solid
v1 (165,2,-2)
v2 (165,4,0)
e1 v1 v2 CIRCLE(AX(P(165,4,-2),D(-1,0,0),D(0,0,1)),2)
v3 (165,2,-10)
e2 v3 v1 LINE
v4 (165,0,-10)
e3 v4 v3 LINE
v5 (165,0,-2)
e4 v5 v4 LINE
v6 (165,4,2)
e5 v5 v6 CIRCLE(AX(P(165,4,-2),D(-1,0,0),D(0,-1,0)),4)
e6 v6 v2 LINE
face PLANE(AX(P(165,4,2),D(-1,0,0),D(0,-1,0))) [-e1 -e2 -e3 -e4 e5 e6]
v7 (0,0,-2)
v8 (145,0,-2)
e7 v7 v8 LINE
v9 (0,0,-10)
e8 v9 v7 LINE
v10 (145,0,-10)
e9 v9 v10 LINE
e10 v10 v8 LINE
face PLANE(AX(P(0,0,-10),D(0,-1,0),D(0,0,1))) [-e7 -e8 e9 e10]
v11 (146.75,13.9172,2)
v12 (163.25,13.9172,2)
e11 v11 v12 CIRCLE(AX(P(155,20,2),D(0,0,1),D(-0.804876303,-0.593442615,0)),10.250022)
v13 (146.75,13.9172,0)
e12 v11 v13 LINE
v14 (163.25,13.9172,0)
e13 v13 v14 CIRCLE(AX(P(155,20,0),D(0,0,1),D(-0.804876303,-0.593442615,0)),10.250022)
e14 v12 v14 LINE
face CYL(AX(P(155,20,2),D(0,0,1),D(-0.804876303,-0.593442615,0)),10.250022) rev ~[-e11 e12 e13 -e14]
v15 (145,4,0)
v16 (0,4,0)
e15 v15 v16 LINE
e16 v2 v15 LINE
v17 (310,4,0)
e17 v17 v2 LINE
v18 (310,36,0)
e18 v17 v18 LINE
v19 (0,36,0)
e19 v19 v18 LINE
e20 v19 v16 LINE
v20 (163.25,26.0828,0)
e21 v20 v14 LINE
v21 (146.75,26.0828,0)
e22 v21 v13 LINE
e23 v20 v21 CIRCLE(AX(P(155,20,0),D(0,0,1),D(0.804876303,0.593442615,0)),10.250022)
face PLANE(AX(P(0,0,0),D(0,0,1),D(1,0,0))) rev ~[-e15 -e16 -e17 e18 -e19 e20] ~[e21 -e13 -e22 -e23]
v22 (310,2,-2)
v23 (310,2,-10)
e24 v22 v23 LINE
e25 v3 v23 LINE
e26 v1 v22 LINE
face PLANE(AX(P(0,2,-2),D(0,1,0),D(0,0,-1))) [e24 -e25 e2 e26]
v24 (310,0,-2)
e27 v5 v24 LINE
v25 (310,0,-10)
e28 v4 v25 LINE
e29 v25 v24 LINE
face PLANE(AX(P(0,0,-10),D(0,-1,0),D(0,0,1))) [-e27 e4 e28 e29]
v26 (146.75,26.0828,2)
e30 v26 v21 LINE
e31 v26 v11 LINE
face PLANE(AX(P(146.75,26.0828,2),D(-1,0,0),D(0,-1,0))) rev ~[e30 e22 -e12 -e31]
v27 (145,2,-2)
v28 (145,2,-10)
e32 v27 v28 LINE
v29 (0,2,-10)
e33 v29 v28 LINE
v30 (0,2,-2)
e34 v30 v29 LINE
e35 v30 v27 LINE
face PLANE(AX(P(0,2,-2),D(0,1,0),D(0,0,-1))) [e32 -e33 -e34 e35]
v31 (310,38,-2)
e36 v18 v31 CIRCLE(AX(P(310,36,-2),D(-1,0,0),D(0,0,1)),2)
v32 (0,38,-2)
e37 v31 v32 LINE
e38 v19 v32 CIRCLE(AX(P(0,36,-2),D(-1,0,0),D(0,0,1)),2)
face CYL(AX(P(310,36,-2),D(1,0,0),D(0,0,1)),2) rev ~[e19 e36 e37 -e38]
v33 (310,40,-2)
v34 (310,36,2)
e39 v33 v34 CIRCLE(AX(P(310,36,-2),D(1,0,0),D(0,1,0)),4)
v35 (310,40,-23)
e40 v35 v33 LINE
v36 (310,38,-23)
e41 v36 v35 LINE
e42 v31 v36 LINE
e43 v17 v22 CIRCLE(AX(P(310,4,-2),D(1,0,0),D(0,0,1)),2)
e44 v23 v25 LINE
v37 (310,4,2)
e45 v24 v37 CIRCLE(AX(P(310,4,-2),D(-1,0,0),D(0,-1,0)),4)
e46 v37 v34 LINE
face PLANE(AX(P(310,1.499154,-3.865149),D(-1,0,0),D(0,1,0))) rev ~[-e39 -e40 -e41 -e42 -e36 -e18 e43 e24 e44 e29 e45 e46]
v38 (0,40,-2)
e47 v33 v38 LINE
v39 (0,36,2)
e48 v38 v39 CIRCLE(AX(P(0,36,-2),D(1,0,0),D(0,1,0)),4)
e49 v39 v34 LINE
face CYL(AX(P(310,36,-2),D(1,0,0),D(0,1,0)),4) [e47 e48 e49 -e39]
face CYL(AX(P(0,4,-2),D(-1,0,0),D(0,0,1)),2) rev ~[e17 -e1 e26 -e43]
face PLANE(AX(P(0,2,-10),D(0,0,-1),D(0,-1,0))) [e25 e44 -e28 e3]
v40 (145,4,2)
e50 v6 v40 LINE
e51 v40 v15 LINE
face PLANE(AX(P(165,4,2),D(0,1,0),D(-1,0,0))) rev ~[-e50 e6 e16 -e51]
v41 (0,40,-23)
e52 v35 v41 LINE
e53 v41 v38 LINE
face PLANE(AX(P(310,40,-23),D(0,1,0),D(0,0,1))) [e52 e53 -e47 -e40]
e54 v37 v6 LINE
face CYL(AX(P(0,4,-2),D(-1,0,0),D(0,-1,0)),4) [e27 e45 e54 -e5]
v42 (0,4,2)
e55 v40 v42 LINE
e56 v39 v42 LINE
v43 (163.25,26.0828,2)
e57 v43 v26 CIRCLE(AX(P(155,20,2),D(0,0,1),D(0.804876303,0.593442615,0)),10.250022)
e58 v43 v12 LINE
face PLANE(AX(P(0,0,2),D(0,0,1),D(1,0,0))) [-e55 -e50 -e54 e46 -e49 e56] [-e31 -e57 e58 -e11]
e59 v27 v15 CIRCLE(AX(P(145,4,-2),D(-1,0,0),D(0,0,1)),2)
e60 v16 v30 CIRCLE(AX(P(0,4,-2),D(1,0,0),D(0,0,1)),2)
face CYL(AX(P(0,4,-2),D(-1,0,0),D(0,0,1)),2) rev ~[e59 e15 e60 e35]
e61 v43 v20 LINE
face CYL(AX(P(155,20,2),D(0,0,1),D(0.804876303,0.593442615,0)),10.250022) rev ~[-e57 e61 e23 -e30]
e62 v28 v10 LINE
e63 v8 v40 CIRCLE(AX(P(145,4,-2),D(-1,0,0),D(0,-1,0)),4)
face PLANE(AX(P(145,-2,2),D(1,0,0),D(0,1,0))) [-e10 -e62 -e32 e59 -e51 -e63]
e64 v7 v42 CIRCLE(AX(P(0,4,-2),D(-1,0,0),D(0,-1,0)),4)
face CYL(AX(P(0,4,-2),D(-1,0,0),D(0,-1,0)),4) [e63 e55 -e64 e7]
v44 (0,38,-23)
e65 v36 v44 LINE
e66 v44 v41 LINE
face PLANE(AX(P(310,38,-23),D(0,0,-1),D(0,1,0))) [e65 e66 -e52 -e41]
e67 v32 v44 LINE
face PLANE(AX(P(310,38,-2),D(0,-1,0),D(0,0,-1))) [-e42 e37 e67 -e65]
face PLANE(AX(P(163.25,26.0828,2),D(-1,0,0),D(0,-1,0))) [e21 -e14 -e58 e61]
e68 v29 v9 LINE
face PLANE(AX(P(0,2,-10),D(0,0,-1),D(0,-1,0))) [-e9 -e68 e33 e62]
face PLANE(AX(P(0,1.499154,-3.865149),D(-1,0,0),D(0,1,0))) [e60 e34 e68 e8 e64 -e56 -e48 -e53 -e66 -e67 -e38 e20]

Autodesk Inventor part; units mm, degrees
ref_plane "YZ Plane" through (0, 0, 0) normal (1, 0, 0) x (0, 1, 0)
ref_plane "XZ Plane" through (0, 0, 0) normal (0, 1, 0) x (-1, 0, 0)
ref_plane "XY Plane" through (0, 0, 0) normal (0, 0, 1) x (1, 0, 0)
sketch "Sketch1" plane through (0, 0, 0) normal (0, 0, 1) x (1, 0, 0)
  line L0 (0, 0) -> (310, 0)
  line L1 (310, 0) -> (310, 40)
  line L2 (310, 40) -> (0, 40)
  line L3 (0, 40) -> (0, 0)
  dimension "d1" = 40
  dimension "d2" = 310
extrude "Plate1" add sketch "Sketch1" along normal blind 2
sketch "Sketch2" plane through (310, 38, 2) normal (0, 1, 0) x (-1, 0, 0)
  line L0 (310, 0) -> (0, 0)
  line L1 (0, 0) -> (0, -25)
  line L2 (0, -25) -> (310, -25)
  line L3 (310, -25) -> (310, 0)
edge flange "Flange1" height 25 angle 90 thickness 2 bend radius 2 thickness toward (0, 1, 0) relief tear relief width 2 relief depth 1 edges at (155, 40, 0) wall of the first edge with corners at (0, 38, 2) (310, 38, 2) (310, 38, -23) (0, 38, -23)
bend "Bend1"
corner "Corner1"
sketch "Sketch3" plane through (0, 2, 2) normal (0, -1, 0) x (1, 0, 0)
  line L0 (310, 0) -> (0, 0)
  line L1 (0, 0) -> (0, -12)
  line L2 (0, -12) -> (310, -12)
  line L3 (310, -12) -> (310, 0)
edge flange "Flange2" height 12 angle 90 thickness 2 bend radius 2 thickness toward (0, -1, 0) relief tear relief width 2 relief depth 1 edges at (155, 0, 0) wall of the first edge with corners at (310, 2, 2) (0, 2, 2) (0, 2, -10) (310, 2, -10)
bend "Bend2"
corner "Corner2"
sketch "Sketch4" plane through (0, 0, 2) normal (0, 0, 1) x (1, 0, 0)
  arc A0 (146.75, 13.9172) -> (163.25, 13.9172) centre (155, 20) ccw
  line L0 (0, 4) -> (0, 36) projected
  line L1 (0, 40) -> (310, 40) projected
  line L2 (146.75, 26.0828) -> (146.75, 13.9172)
  line L3 (163.25, 26.0828) -> (163.25, 13.9172)
  arc A1 (146.75, 26.0828) -> (146.75, 13.9172) centre (155, 20) ccw construction
  arc A2 (163.25, 26.0828) -> (146.75, 26.0828) centre (155, 20) ccw
  arc A3 (163.25, 13.9172) -> (163.25, 26.0828) centre (155, 20) ccw construction
  point P0 (0, 0)
  point P1 (0, 20)
  point P2 (155, 40)
  dimension "d25" = 20.5
  dimension "d26" = 16.5
extrude "Cut1" cut sketch "Sketch4" against normal blind 2
sketch "Sketch5" plane through (0, 0, 2) normal (0, 0, 1) x (1, 0, 0)
  line L0 (310, 4) -> (0, 4) projected
  line L1 (145, 4) -> (165, 4)
  line L2 (165, 4) -> (165, -2)
  line L3 (165, -2) -> (145, -2)
  line L4 (145, -2) -> (145, 4)
  point P0 (0, 0)
  point P1 (155, -2)
  point P2 (155, 4)
  dimension "d27" = 20
  dimension "d28" = 6
extrude "Cut2" cut sketch "Sketch5" against normal through all
equation "\"d23\" = Thickness"
equation "\"d29\" = Thickness"
equation "\"d3\" = BendReliefWidth"
equation "\"d4\" = BendReliefDepth"
equation "\"d5\" = MinimumRemnant"
equation "\"d6\" = BendRadius"
equation "\"d9\" = BendRadius"
equation "\"d10\" = CornerReliefSize"
equation "\"d11\" = GapSize"
equation "\"d12\" = JacobiRadiusSize"
equation "\"d13\" = BendReliefWidth"
equation "\"d14\" = BendReliefDepth"
equation "\"d15\" = MinimumRemnant"
equation "\"d16\" = BendRadius"
equation "\"d19\" = BendRadius"
equation "\"d20\" = CornerReliefSize"
equation "\"d21\" = GapSize"
equation "\"d22\" = JacobiRadiusSize"
equation "\"BendRadius\" = Thickness"
equation "\"BendReliefWidth\" = Thickness"
equation "\"BendReliefDepth\" = 0.5 * Thickness"
equation "\"CornerReliefSize\" = 4 * Thickness"
equation "\"MinimumRemnant\" = 2 * Thickness"
equation "\"TransitionRadius\" = BendRadius"
equation "\"JacobiRadiusSize\" = BendRadius"
equation "\"GapSize\" = Thickness"
equation "\"d0\" = BendRadius"
equation "\"Thickness\" = 2"
